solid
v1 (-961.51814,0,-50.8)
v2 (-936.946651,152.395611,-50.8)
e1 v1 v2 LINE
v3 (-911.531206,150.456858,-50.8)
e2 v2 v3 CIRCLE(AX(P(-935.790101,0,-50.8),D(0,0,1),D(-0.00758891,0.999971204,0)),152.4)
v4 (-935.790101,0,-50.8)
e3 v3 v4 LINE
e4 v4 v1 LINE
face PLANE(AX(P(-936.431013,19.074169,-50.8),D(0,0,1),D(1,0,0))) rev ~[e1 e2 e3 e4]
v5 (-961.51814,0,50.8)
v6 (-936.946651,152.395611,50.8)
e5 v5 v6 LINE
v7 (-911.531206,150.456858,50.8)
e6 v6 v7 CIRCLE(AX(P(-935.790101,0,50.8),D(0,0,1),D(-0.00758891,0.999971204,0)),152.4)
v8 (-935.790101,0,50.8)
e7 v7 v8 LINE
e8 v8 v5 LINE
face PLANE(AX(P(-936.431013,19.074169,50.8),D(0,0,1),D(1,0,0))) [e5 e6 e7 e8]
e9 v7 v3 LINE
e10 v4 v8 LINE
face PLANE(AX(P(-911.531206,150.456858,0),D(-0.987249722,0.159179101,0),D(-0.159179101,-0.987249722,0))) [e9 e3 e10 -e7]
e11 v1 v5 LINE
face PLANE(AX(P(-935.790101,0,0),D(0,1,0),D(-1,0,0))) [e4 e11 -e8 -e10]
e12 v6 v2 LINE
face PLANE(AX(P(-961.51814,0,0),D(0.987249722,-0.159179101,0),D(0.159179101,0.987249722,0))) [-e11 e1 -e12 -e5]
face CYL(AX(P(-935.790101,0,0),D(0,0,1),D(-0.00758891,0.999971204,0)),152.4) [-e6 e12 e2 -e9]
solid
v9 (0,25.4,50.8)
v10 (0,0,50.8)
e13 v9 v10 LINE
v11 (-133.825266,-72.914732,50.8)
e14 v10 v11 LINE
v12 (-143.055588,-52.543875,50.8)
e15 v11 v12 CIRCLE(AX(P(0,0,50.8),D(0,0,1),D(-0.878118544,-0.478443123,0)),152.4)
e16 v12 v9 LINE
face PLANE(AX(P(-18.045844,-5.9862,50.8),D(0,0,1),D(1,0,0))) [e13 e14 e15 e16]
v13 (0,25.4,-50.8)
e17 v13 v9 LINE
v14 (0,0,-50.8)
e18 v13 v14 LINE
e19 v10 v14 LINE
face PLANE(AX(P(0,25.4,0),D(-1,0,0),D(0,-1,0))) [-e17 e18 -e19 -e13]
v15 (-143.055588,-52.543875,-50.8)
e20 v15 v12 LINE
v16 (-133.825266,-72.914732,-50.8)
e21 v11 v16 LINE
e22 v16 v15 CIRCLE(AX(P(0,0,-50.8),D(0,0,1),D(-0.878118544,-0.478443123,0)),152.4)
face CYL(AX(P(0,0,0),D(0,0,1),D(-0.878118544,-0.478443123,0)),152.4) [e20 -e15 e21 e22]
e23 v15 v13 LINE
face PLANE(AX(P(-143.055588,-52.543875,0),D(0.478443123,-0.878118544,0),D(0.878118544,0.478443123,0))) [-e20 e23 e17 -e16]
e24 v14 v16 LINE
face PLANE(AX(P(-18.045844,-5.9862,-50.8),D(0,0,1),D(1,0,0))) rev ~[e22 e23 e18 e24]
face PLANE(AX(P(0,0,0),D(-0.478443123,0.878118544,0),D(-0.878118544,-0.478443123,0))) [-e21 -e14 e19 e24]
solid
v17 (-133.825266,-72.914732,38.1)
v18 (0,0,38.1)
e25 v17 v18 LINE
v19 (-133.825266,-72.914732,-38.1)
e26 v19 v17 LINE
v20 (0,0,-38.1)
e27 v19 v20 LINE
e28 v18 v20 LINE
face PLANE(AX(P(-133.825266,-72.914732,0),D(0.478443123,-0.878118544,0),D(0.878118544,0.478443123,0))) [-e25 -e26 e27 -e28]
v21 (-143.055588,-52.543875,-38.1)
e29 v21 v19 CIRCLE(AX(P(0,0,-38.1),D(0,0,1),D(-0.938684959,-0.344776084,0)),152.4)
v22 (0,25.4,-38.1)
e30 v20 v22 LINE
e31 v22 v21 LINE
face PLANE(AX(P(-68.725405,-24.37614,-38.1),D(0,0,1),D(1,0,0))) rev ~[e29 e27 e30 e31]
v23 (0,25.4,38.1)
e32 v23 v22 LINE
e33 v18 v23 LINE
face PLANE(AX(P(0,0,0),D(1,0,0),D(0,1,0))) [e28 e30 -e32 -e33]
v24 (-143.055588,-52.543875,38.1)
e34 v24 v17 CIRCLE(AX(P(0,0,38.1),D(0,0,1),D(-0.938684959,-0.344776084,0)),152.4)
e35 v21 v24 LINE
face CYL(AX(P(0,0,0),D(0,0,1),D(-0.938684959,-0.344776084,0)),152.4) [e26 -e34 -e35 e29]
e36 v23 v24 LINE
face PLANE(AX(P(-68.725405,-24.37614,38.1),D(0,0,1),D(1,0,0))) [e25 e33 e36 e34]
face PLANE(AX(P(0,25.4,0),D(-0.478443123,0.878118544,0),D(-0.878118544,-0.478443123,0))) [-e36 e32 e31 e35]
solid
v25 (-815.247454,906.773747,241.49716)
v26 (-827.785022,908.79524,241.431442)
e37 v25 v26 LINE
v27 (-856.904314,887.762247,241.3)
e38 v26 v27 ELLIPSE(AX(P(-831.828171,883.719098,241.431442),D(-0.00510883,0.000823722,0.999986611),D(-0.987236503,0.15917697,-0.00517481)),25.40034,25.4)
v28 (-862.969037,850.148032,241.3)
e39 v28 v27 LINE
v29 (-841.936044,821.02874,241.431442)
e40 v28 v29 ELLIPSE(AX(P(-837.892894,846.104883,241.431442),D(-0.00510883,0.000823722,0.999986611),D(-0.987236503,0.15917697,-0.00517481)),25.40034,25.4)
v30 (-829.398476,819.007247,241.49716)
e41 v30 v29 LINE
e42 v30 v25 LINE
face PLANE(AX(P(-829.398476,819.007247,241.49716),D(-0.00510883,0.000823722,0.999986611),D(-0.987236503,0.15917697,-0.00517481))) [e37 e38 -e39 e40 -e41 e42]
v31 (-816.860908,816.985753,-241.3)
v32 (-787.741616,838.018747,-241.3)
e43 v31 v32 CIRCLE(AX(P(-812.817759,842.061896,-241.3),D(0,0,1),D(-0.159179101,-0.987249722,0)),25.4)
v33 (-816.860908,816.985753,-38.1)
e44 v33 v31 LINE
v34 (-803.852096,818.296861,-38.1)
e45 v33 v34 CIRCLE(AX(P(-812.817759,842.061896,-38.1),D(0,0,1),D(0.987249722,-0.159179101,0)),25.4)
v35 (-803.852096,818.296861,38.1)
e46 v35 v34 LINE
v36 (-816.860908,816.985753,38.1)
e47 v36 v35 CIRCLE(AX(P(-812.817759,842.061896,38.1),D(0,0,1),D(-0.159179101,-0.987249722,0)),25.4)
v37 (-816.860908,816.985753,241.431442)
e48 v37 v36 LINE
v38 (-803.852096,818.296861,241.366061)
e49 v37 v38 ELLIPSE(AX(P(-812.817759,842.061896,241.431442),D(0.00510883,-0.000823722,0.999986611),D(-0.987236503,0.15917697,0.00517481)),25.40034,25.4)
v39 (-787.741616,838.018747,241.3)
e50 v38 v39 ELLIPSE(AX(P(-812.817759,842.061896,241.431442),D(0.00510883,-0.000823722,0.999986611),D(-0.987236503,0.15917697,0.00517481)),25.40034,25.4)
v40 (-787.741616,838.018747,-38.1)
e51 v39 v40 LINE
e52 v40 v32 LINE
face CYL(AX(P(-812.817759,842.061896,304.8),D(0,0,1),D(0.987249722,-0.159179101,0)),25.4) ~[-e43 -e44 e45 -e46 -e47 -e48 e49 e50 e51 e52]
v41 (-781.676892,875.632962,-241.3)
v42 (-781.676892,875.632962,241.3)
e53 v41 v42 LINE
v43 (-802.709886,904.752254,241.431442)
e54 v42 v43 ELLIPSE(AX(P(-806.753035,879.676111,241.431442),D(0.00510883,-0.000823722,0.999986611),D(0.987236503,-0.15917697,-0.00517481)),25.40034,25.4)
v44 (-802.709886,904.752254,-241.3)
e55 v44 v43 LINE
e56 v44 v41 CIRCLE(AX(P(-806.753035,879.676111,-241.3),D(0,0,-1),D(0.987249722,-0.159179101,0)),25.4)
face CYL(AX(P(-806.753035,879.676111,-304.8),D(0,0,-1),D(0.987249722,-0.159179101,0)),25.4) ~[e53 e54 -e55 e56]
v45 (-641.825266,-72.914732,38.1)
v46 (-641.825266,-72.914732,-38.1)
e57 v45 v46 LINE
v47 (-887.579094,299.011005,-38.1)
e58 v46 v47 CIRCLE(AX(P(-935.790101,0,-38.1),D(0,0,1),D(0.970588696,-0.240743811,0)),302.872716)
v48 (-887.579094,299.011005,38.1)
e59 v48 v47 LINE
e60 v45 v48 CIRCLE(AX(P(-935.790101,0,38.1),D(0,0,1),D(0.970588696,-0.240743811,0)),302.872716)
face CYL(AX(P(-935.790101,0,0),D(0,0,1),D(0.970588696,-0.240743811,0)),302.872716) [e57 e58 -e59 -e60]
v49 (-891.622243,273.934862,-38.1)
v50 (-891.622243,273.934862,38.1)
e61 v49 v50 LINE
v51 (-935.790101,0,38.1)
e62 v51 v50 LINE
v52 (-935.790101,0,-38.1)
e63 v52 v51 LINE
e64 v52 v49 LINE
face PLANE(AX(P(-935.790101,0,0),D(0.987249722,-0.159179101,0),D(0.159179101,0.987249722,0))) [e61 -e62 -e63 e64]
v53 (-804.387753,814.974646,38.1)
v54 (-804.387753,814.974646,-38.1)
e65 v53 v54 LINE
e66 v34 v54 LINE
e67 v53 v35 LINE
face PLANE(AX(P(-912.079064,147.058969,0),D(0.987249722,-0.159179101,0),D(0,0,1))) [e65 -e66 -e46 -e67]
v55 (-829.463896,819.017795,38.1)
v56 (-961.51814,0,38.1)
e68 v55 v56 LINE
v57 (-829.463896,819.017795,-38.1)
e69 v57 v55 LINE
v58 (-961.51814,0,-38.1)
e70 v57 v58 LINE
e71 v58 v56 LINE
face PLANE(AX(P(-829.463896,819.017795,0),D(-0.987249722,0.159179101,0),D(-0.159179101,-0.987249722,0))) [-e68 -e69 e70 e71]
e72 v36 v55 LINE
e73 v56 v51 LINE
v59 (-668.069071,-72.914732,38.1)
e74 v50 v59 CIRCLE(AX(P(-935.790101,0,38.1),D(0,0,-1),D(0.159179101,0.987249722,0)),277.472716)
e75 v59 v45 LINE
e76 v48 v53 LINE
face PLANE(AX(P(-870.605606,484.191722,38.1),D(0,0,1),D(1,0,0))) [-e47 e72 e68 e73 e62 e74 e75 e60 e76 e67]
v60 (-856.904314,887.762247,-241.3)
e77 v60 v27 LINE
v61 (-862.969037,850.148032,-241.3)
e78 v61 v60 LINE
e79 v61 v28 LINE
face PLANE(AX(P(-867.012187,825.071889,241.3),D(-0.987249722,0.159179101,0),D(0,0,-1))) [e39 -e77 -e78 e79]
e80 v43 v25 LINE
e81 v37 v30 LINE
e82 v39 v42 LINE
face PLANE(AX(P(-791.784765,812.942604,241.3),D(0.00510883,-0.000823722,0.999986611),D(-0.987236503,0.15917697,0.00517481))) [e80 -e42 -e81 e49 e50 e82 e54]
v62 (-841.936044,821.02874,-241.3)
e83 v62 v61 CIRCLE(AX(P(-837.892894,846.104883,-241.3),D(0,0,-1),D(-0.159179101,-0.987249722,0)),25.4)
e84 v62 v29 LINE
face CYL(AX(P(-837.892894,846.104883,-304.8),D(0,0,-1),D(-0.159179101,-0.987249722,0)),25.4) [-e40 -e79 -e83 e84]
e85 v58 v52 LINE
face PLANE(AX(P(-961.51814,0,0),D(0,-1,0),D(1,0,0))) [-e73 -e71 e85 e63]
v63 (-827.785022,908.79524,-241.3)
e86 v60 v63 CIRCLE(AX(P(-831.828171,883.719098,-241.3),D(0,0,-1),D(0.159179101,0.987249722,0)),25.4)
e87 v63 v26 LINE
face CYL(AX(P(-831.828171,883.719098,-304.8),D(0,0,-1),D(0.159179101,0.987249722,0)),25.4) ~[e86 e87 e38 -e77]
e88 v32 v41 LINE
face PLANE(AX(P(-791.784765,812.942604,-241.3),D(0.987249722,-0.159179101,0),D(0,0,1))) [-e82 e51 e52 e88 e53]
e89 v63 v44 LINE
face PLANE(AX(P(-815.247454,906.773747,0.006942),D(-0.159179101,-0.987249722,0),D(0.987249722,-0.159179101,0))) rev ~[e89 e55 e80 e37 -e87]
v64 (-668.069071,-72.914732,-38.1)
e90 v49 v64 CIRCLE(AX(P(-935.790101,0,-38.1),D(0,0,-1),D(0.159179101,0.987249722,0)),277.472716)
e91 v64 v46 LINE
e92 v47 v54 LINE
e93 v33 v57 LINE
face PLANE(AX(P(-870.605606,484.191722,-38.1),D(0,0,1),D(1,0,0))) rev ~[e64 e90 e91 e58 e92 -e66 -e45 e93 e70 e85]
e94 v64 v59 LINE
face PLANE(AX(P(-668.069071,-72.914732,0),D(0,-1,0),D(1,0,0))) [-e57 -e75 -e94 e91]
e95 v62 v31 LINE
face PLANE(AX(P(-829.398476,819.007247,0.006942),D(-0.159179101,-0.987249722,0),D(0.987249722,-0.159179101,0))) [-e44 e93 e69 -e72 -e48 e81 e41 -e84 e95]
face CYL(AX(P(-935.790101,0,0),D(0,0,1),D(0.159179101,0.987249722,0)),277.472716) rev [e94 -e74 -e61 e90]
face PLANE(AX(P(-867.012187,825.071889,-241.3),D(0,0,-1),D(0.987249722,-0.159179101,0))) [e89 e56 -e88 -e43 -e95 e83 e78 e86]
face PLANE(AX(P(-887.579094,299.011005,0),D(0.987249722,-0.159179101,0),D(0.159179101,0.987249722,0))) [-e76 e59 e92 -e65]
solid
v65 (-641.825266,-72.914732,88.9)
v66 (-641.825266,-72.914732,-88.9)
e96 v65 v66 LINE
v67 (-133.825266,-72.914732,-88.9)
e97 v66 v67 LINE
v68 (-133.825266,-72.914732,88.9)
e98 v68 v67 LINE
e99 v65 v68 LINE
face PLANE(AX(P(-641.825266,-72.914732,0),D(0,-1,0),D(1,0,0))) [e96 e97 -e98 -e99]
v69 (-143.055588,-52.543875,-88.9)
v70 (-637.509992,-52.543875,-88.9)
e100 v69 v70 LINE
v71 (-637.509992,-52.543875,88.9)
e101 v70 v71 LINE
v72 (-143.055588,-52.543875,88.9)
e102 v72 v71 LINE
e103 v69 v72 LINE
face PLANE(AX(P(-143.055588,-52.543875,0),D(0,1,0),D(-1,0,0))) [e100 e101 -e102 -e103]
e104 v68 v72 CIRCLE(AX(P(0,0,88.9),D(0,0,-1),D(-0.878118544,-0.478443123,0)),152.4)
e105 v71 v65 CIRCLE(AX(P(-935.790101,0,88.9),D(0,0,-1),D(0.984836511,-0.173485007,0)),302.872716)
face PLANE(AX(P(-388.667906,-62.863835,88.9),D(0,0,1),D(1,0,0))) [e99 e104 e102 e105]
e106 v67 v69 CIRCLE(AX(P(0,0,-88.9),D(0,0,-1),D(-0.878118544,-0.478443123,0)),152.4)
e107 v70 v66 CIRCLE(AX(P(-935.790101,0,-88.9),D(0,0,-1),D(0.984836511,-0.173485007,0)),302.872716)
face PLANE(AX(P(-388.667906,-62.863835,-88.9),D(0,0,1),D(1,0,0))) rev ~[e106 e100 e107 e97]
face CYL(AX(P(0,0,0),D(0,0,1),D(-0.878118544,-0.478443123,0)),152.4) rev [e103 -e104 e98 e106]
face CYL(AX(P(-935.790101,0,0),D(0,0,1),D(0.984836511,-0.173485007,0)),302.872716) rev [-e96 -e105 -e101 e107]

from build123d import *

# Parameters (mm, degrees)
F1_DEPTH      = 50.8
F1_DEPTH_BACK = 50.8
F2_DEPTH      = 38.1
F2_DEPTH_BACK = 38.1
F3_DEPTH      = 88.9
F3_DEPTH_BACK = 88.9
F6_DEPTH      = 88.9
F7_T1_DEPTH   = 609.6
F7_T6_DEPTH   = 609.6
F7_T12_DEPTH  = 609.6
F7_T18_DEPTH  = 609.6
F7_T25_DEPTH  = 609.6
F7_T31_DEPTH  = 609.6


# Not quite as in the source:
# - a fillet or chamfer that OpenCascade refuses, or shapes differently, is made with other operations: its cross-section is extruded or revolved along the edge and cut away or added


with BuildPart() as f1:
    # F0 (on Top) → F1 (new body, two sides)
    with BuildSketch(Plane.XY) as f1_sk:
        with BuildLine():
            ThreePointArc((-783.3901008351, 0), (-819.7667936825, 98.8147367419), (-911.5312057875, 150.4568576405))
            Line((-911.5312057875, 150.4568576405), (-935.7901008351, 0))
            Line((-935.7901008351, 0), (-961.5181404919, 0))
            Line((-961.5181404919, 0), (-936.9466506832, 152.3956114606))
            ThreePointArc((-936.9466506832, 152.3956114606), (-1043.1434934298, -108.1712027225), (-783.3901008351, 0))
        make_face()
    extrude(amount=F1_DEPTH)
    extrude(f1_sk.sketch, amount=-F1_DEPTH_BACK)


with BuildPart() as f1b:
    # F0 (on Top) → F1, piece 2 (new body, two sides)
    with BuildSketch(Plane.XY) as f1_2_sk:
        with BuildLine():
            ThreePointArc((-133.8252661358, -72.9147320071), (37.6217320235, -147.6833276966), (152.4, 0))
            ThreePointArc((152.4, 0), (-26.6841566333, 150.0457123172), (-143.0555877267, -52.5438751919))
            Line((-143.0555877267, -52.5438751919), (0, 25.4))
            Line((0, 25.4), (0, 0))
            Line((0, 0), (-133.8252661358, -72.9147320071))
        make_face()
    extrude(amount=F1_DEPTH)
    extrude(f1_2_sk.sketch, amount=-F1_DEPTH_BACK)


with BuildPart() as f2:
    # F0 (on Top) → F2 (new body, two sides)
    with BuildSketch(Plane.XY) as f2_sk:
        with BuildLine():
            Line((-891.6222432269, 273.9348618882), (-887.5790940523, 299.0110048283))
            Line((-887.5790940523, 299.0110048283), (-804.3877526602, 814.9746455529))
            Line((-804.3877526602, 814.9746455529), (-829.4638956003, 819.0177947275))
            Line((-829.4638956003, 819.0177947275), (-936.9466506832, 152.3956114606))
            ThreePointArc((-936.9466506832, 152.3956114606), (-924.1983244388, 151.9585164444), (-911.5312057875, 150.4568576405))
            Line((-911.5312057875, 150.4568576405), (-891.6222432269, 273.9348618882))
        make_face()
        with BuildLine():
            Line((-935.7901008351, 0), (-911.5312057875, 150.4568576405))
            ThreePointArc((-911.5312057875, 150.4568576405), (-924.1983244388, 151.9585164444), (-936.9466506832, 152.3956114606))
            Line((-936.9466506832, 152.3956114606), (-961.5181404919, 0))
            Line((-961.5181404919, 0), (-935.7901008351, 0))
        make_face()
        with BuildLine():
            ThreePointArc((-641.8252661358, -72.9147320071), (-639.4925118211, -62.7663996731), (-637.5099919387, -52.5438751919))
            ThreePointArc((-637.5099919387, -52.5438751919), (-688.9870787149, 175.5566873001), (-887.5790940523, 299.0110048283))
            Line((-887.5790940523, 299.0110048283), (-891.6222432269, 273.9348618882))
            ThreePointArc((-891.6222432269, 273.9348618882), (-702.5631088402, 150.3205854446), (-668.0690705447, -72.9147320071))
            Line((-668.0690705447, -72.9147320071), (-641.8252661358, -72.9147320071))
        make_face()
    extrude(amount=F2_DEPTH)
    extrude(f2_sk.sketch, amount=-F2_DEPTH_BACK)

    # F5 (on line) → F6 (join)
    with BuildSketch(Plane(origin=(107.6913114103, 667.9156770389, 0), x_dir=(0.9872497221, -0.1591791014, 0), z_dir=(-0.1591791014, -0.9872497221, 0))):
        Polygon((-911.0927623749, 0), (-911.0927623749, 241.3), (-949.192252238, 241.4971602735), (-987.291742101, 241.3), (-987.291742101, 0), (-987.291742101, -241.3), (-949.1927623749, -241.3), (-911.0927623749, -241.3), align=None)
    extrude(amount=-F6_DEPTH)

    # F7: fillet of radius 25.4 on 4 edges, made by hand

    # F7_s2 → F7_t1 (cut)
    with BuildSketch(Plane.XY.offset(-304.8)):
        with BuildLine():
            ThreePointArc((-781.6768920702, 875.6329615621), (-786.1625860927, 894.5486832569), (-802.7098858357, 904.7522536768))
            Line((-802.7098858357, 904.7522536768), (-777.6337428956, 900.7091045022))
            Line((-777.6337428956, 900.7091045022), (-781.6768920702, 875.6329615621))
        make_face()
        with BuildLine():
            ThreePointArc((-827.7850215107, 908.7952404451), (-846.7007432055, 904.3095464227), (-856.9043136254, 887.7622466796))
            Line((-856.9043136254, 887.7622466796), (-852.8611644508, 912.8383896197))
            Line((-852.8611644508, 912.8383896197), (-827.7850215107, 908.7952404451))
        make_face()
        with BuildLine():
            ThreePointArc((-841.9360436219, 821.0287401548), (-858.4833433649, 831.2323105747), (-862.9690373873, 850.1480322695))
            Line((-862.9690373873, 850.1480322695), (-867.0121865619, 825.0718893294))
            Line((-867.0121865619, 825.0718893294), (-841.9360436219, 821.0287401548))
        make_face()
    extrude(amount=F7_T1_DEPTH, mode=Mode.SUBTRACT)


with BuildPart() as f2b:
    # F0 (on Top) → F2, piece 2 (new body, two sides)
    with BuildSketch(Plane.XY) as f2_2_sk:
        with BuildLine():
            Line((0, 25.4), (-143.0555877267, -52.5438751919))
            ThreePointArc((-143.0555877267, -52.5438751919), (-138.8146057184, -62.8988492681), (-133.8252661358, -72.9147320071))
            Line((-133.8252661358, -72.9147320071), (0, 0))
            Line((0, 0), (0, 25.4))
        make_face()
    extrude(amount=F2_DEPTH)
    extrude(f2_2_sk.sketch, amount=-F2_DEPTH_BACK)


with BuildPart() as f3:
    # F0 (on Top) → F3 (new body, two sides)
    with BuildSketch(Plane.XY) as f3_sk:
        with BuildLine():
            ThreePointArc((-133.8252661358, -72.9147320071), (-138.8146057184, -62.8988492681), (-143.0555877267, -52.5438751919))
            Line((-143.0555877267, -52.5438751919), (-637.5099919387, -52.5438751919))
            ThreePointArc((-637.5099919387, -52.5438751919), (-639.4925118211, -62.7663996731), (-641.8252661358, -72.9147320071))
            Line((-641.8252661358, -72.9147320071), (-133.8252661358, -72.9147320071))
        make_face()
    extrude(amount=F3_DEPTH)
    extrude(f3_sk.sketch, amount=-F3_DEPTH_BACK)


with BuildPart() as f7_tool4:
    # F7_s5 → F7_t6 (new body)
    with BuildSketch(Plane.XY.offset(304.8)):
        with BuildLine():
            ThreePointArc((-787.7416158321, 838.0187471519), (-797.945186252, 821.4714474089), (-816.8609079468, 816.9857533865))
            Line((-816.8609079468, 816.9857533865), (-791.7847650068, 812.9426042119))
            Line((-791.7847650068, 812.9426042119), (-787.7416158321, 838.0187471519))
        make_face()
    extrude(amount=-F7_T6_DEPTH)

    split(bisect_by=Plane.XY.offset(38.1), keep=Keep.TOP)

    split(bisect_by=Plane(origin=(-912.0790640705, 147.058968514, 0), x_dir=(0, 0, 1), z_dir=(0.9872497221, -0.1591791014, 0)), keep=Keep.TOP)


with BuildPart() as f2_1:
    add(f2.part)

    # F7_t3: cut F7_tool4
    add(f7_tool4.part, mode=Mode.SUBTRACT)


with BuildPart() as f7_tool10:
    # F7_s11 → F7_t12 (new body)
    with BuildSketch(Plane.XY.offset(304.8)):
        with BuildLine():
            ThreePointArc((-787.7416158321, 838.0187471519), (-797.945186252, 821.4714474089), (-816.8609079468, 816.9857533865))
            Line((-816.8609079468, 816.9857533865), (-791.7847650068, 812.9426042119))
            Line((-791.7847650068, 812.9426042119), (-787.7416158321, 838.0187471519))
        make_face()
    extrude(amount=-F7_T12_DEPTH)

    split(bisect_by=Plane.XY.offset(38.1), keep=Keep.TOP)

    split(bisect_by=Plane(origin=(-912.0790640705, 147.058968514, 0), x_dir=(0, 0, 1), z_dir=(-0.9872497221, 0.1591791014, 0)), keep=Keep.TOP)


with BuildPart() as f2_2:
    add(f2_1.part)

    # F7_t9: cut F7_tool10
    add(f7_tool10.part, mode=Mode.SUBTRACT)


with BuildPart() as f7_tool16:
    # F7_s17 → F7_t18 (new body)
    with BuildSketch(Plane.XY.offset(304.8)):
        with BuildLine():
            ThreePointArc((-787.7416158321, 838.0187471519), (-797.945186252, 821.4714474089), (-816.8609079468, 816.9857533865))
            Line((-816.8609079468, 816.9857533865), (-791.7847650068, 812.9426042119))
            Line((-791.7847650068, 812.9426042119), (-787.7416158321, 838.0187471519))
        make_face()
    extrude(amount=-F7_T18_DEPTH)

    split(bisect_by=Plane.XY.offset(38.1), keep=Keep.BOTTOM)

    split(bisect_by=Plane.XY.offset(-38.1), keep=Keep.TOP)

    split(bisect_by=Plane(origin=(-912.0790640705, 147.058968514, 0), x_dir=(0, 0, 1), z_dir=(0.9872497221, -0.1591791014, 0)), keep=Keep.TOP)


with BuildPart() as f2_3:
    add(f2_2.part)

    # F7_t15: cut F7_tool16
    add(f7_tool16.part, mode=Mode.SUBTRACT)


with BuildPart() as f7_tool23:
    # F7_s24 → F7_t25 (new body)
    with BuildSketch(Plane.XY.offset(304.8)):
        with BuildLine():
            ThreePointArc((-787.7416158321, 838.0187471519), (-797.945186252, 821.4714474089), (-816.8609079468, 816.9857533865))
            Line((-816.8609079468, 816.9857533865), (-791.7847650068, 812.9426042119))
            Line((-791.7847650068, 812.9426042119), (-787.7416158321, 838.0187471519))
        make_face()
    extrude(amount=-F7_T25_DEPTH)

    split(bisect_by=Plane.XY.offset(-38.1), keep=Keep.BOTTOM)

    split(bisect_by=Plane(origin=(-912.0790640705, 147.058968514, 0), x_dir=(0, 0, 1), z_dir=(0.9872497221, -0.1591791014, 0)), keep=Keep.TOP)


with BuildPart() as f2_4:
    add(f2_3.part)

    # F7_t22: cut F7_tool23
    add(f7_tool23.part, mode=Mode.SUBTRACT)


with BuildPart() as f7_tool29:
    # F7_s30 → F7_t31 (new body)
    with BuildSketch(Plane.XY.offset(304.8)):
        with BuildLine():
            ThreePointArc((-787.7416158321, 838.0187471519), (-797.945186252, 821.4714474089), (-816.8609079468, 816.9857533865))
            Line((-816.8609079468, 816.9857533865), (-791.7847650068, 812.9426042119))
            Line((-791.7847650068, 812.9426042119), (-787.7416158321, 838.0187471519))
        make_face()
    extrude(amount=-F7_T31_DEPTH)

    split(bisect_by=Plane.XY.offset(-38.1), keep=Keep.BOTTOM)

    split(bisect_by=Plane(origin=(-912.0790640705, 147.058968514, 0), x_dir=(0, 0, 1), z_dir=(-0.9872497221, 0.1591791014, 0)), keep=Keep.TOP)


with BuildPart() as f2_5:
    add(f2_4.part)

    # F7_t28: cut F7_tool29
    add(f7_tool29.part, mode=Mode.SUBTRACT)


solid = Compound([f1.part, f1b.part, f2b.part, f3.part, f2_5.part])
